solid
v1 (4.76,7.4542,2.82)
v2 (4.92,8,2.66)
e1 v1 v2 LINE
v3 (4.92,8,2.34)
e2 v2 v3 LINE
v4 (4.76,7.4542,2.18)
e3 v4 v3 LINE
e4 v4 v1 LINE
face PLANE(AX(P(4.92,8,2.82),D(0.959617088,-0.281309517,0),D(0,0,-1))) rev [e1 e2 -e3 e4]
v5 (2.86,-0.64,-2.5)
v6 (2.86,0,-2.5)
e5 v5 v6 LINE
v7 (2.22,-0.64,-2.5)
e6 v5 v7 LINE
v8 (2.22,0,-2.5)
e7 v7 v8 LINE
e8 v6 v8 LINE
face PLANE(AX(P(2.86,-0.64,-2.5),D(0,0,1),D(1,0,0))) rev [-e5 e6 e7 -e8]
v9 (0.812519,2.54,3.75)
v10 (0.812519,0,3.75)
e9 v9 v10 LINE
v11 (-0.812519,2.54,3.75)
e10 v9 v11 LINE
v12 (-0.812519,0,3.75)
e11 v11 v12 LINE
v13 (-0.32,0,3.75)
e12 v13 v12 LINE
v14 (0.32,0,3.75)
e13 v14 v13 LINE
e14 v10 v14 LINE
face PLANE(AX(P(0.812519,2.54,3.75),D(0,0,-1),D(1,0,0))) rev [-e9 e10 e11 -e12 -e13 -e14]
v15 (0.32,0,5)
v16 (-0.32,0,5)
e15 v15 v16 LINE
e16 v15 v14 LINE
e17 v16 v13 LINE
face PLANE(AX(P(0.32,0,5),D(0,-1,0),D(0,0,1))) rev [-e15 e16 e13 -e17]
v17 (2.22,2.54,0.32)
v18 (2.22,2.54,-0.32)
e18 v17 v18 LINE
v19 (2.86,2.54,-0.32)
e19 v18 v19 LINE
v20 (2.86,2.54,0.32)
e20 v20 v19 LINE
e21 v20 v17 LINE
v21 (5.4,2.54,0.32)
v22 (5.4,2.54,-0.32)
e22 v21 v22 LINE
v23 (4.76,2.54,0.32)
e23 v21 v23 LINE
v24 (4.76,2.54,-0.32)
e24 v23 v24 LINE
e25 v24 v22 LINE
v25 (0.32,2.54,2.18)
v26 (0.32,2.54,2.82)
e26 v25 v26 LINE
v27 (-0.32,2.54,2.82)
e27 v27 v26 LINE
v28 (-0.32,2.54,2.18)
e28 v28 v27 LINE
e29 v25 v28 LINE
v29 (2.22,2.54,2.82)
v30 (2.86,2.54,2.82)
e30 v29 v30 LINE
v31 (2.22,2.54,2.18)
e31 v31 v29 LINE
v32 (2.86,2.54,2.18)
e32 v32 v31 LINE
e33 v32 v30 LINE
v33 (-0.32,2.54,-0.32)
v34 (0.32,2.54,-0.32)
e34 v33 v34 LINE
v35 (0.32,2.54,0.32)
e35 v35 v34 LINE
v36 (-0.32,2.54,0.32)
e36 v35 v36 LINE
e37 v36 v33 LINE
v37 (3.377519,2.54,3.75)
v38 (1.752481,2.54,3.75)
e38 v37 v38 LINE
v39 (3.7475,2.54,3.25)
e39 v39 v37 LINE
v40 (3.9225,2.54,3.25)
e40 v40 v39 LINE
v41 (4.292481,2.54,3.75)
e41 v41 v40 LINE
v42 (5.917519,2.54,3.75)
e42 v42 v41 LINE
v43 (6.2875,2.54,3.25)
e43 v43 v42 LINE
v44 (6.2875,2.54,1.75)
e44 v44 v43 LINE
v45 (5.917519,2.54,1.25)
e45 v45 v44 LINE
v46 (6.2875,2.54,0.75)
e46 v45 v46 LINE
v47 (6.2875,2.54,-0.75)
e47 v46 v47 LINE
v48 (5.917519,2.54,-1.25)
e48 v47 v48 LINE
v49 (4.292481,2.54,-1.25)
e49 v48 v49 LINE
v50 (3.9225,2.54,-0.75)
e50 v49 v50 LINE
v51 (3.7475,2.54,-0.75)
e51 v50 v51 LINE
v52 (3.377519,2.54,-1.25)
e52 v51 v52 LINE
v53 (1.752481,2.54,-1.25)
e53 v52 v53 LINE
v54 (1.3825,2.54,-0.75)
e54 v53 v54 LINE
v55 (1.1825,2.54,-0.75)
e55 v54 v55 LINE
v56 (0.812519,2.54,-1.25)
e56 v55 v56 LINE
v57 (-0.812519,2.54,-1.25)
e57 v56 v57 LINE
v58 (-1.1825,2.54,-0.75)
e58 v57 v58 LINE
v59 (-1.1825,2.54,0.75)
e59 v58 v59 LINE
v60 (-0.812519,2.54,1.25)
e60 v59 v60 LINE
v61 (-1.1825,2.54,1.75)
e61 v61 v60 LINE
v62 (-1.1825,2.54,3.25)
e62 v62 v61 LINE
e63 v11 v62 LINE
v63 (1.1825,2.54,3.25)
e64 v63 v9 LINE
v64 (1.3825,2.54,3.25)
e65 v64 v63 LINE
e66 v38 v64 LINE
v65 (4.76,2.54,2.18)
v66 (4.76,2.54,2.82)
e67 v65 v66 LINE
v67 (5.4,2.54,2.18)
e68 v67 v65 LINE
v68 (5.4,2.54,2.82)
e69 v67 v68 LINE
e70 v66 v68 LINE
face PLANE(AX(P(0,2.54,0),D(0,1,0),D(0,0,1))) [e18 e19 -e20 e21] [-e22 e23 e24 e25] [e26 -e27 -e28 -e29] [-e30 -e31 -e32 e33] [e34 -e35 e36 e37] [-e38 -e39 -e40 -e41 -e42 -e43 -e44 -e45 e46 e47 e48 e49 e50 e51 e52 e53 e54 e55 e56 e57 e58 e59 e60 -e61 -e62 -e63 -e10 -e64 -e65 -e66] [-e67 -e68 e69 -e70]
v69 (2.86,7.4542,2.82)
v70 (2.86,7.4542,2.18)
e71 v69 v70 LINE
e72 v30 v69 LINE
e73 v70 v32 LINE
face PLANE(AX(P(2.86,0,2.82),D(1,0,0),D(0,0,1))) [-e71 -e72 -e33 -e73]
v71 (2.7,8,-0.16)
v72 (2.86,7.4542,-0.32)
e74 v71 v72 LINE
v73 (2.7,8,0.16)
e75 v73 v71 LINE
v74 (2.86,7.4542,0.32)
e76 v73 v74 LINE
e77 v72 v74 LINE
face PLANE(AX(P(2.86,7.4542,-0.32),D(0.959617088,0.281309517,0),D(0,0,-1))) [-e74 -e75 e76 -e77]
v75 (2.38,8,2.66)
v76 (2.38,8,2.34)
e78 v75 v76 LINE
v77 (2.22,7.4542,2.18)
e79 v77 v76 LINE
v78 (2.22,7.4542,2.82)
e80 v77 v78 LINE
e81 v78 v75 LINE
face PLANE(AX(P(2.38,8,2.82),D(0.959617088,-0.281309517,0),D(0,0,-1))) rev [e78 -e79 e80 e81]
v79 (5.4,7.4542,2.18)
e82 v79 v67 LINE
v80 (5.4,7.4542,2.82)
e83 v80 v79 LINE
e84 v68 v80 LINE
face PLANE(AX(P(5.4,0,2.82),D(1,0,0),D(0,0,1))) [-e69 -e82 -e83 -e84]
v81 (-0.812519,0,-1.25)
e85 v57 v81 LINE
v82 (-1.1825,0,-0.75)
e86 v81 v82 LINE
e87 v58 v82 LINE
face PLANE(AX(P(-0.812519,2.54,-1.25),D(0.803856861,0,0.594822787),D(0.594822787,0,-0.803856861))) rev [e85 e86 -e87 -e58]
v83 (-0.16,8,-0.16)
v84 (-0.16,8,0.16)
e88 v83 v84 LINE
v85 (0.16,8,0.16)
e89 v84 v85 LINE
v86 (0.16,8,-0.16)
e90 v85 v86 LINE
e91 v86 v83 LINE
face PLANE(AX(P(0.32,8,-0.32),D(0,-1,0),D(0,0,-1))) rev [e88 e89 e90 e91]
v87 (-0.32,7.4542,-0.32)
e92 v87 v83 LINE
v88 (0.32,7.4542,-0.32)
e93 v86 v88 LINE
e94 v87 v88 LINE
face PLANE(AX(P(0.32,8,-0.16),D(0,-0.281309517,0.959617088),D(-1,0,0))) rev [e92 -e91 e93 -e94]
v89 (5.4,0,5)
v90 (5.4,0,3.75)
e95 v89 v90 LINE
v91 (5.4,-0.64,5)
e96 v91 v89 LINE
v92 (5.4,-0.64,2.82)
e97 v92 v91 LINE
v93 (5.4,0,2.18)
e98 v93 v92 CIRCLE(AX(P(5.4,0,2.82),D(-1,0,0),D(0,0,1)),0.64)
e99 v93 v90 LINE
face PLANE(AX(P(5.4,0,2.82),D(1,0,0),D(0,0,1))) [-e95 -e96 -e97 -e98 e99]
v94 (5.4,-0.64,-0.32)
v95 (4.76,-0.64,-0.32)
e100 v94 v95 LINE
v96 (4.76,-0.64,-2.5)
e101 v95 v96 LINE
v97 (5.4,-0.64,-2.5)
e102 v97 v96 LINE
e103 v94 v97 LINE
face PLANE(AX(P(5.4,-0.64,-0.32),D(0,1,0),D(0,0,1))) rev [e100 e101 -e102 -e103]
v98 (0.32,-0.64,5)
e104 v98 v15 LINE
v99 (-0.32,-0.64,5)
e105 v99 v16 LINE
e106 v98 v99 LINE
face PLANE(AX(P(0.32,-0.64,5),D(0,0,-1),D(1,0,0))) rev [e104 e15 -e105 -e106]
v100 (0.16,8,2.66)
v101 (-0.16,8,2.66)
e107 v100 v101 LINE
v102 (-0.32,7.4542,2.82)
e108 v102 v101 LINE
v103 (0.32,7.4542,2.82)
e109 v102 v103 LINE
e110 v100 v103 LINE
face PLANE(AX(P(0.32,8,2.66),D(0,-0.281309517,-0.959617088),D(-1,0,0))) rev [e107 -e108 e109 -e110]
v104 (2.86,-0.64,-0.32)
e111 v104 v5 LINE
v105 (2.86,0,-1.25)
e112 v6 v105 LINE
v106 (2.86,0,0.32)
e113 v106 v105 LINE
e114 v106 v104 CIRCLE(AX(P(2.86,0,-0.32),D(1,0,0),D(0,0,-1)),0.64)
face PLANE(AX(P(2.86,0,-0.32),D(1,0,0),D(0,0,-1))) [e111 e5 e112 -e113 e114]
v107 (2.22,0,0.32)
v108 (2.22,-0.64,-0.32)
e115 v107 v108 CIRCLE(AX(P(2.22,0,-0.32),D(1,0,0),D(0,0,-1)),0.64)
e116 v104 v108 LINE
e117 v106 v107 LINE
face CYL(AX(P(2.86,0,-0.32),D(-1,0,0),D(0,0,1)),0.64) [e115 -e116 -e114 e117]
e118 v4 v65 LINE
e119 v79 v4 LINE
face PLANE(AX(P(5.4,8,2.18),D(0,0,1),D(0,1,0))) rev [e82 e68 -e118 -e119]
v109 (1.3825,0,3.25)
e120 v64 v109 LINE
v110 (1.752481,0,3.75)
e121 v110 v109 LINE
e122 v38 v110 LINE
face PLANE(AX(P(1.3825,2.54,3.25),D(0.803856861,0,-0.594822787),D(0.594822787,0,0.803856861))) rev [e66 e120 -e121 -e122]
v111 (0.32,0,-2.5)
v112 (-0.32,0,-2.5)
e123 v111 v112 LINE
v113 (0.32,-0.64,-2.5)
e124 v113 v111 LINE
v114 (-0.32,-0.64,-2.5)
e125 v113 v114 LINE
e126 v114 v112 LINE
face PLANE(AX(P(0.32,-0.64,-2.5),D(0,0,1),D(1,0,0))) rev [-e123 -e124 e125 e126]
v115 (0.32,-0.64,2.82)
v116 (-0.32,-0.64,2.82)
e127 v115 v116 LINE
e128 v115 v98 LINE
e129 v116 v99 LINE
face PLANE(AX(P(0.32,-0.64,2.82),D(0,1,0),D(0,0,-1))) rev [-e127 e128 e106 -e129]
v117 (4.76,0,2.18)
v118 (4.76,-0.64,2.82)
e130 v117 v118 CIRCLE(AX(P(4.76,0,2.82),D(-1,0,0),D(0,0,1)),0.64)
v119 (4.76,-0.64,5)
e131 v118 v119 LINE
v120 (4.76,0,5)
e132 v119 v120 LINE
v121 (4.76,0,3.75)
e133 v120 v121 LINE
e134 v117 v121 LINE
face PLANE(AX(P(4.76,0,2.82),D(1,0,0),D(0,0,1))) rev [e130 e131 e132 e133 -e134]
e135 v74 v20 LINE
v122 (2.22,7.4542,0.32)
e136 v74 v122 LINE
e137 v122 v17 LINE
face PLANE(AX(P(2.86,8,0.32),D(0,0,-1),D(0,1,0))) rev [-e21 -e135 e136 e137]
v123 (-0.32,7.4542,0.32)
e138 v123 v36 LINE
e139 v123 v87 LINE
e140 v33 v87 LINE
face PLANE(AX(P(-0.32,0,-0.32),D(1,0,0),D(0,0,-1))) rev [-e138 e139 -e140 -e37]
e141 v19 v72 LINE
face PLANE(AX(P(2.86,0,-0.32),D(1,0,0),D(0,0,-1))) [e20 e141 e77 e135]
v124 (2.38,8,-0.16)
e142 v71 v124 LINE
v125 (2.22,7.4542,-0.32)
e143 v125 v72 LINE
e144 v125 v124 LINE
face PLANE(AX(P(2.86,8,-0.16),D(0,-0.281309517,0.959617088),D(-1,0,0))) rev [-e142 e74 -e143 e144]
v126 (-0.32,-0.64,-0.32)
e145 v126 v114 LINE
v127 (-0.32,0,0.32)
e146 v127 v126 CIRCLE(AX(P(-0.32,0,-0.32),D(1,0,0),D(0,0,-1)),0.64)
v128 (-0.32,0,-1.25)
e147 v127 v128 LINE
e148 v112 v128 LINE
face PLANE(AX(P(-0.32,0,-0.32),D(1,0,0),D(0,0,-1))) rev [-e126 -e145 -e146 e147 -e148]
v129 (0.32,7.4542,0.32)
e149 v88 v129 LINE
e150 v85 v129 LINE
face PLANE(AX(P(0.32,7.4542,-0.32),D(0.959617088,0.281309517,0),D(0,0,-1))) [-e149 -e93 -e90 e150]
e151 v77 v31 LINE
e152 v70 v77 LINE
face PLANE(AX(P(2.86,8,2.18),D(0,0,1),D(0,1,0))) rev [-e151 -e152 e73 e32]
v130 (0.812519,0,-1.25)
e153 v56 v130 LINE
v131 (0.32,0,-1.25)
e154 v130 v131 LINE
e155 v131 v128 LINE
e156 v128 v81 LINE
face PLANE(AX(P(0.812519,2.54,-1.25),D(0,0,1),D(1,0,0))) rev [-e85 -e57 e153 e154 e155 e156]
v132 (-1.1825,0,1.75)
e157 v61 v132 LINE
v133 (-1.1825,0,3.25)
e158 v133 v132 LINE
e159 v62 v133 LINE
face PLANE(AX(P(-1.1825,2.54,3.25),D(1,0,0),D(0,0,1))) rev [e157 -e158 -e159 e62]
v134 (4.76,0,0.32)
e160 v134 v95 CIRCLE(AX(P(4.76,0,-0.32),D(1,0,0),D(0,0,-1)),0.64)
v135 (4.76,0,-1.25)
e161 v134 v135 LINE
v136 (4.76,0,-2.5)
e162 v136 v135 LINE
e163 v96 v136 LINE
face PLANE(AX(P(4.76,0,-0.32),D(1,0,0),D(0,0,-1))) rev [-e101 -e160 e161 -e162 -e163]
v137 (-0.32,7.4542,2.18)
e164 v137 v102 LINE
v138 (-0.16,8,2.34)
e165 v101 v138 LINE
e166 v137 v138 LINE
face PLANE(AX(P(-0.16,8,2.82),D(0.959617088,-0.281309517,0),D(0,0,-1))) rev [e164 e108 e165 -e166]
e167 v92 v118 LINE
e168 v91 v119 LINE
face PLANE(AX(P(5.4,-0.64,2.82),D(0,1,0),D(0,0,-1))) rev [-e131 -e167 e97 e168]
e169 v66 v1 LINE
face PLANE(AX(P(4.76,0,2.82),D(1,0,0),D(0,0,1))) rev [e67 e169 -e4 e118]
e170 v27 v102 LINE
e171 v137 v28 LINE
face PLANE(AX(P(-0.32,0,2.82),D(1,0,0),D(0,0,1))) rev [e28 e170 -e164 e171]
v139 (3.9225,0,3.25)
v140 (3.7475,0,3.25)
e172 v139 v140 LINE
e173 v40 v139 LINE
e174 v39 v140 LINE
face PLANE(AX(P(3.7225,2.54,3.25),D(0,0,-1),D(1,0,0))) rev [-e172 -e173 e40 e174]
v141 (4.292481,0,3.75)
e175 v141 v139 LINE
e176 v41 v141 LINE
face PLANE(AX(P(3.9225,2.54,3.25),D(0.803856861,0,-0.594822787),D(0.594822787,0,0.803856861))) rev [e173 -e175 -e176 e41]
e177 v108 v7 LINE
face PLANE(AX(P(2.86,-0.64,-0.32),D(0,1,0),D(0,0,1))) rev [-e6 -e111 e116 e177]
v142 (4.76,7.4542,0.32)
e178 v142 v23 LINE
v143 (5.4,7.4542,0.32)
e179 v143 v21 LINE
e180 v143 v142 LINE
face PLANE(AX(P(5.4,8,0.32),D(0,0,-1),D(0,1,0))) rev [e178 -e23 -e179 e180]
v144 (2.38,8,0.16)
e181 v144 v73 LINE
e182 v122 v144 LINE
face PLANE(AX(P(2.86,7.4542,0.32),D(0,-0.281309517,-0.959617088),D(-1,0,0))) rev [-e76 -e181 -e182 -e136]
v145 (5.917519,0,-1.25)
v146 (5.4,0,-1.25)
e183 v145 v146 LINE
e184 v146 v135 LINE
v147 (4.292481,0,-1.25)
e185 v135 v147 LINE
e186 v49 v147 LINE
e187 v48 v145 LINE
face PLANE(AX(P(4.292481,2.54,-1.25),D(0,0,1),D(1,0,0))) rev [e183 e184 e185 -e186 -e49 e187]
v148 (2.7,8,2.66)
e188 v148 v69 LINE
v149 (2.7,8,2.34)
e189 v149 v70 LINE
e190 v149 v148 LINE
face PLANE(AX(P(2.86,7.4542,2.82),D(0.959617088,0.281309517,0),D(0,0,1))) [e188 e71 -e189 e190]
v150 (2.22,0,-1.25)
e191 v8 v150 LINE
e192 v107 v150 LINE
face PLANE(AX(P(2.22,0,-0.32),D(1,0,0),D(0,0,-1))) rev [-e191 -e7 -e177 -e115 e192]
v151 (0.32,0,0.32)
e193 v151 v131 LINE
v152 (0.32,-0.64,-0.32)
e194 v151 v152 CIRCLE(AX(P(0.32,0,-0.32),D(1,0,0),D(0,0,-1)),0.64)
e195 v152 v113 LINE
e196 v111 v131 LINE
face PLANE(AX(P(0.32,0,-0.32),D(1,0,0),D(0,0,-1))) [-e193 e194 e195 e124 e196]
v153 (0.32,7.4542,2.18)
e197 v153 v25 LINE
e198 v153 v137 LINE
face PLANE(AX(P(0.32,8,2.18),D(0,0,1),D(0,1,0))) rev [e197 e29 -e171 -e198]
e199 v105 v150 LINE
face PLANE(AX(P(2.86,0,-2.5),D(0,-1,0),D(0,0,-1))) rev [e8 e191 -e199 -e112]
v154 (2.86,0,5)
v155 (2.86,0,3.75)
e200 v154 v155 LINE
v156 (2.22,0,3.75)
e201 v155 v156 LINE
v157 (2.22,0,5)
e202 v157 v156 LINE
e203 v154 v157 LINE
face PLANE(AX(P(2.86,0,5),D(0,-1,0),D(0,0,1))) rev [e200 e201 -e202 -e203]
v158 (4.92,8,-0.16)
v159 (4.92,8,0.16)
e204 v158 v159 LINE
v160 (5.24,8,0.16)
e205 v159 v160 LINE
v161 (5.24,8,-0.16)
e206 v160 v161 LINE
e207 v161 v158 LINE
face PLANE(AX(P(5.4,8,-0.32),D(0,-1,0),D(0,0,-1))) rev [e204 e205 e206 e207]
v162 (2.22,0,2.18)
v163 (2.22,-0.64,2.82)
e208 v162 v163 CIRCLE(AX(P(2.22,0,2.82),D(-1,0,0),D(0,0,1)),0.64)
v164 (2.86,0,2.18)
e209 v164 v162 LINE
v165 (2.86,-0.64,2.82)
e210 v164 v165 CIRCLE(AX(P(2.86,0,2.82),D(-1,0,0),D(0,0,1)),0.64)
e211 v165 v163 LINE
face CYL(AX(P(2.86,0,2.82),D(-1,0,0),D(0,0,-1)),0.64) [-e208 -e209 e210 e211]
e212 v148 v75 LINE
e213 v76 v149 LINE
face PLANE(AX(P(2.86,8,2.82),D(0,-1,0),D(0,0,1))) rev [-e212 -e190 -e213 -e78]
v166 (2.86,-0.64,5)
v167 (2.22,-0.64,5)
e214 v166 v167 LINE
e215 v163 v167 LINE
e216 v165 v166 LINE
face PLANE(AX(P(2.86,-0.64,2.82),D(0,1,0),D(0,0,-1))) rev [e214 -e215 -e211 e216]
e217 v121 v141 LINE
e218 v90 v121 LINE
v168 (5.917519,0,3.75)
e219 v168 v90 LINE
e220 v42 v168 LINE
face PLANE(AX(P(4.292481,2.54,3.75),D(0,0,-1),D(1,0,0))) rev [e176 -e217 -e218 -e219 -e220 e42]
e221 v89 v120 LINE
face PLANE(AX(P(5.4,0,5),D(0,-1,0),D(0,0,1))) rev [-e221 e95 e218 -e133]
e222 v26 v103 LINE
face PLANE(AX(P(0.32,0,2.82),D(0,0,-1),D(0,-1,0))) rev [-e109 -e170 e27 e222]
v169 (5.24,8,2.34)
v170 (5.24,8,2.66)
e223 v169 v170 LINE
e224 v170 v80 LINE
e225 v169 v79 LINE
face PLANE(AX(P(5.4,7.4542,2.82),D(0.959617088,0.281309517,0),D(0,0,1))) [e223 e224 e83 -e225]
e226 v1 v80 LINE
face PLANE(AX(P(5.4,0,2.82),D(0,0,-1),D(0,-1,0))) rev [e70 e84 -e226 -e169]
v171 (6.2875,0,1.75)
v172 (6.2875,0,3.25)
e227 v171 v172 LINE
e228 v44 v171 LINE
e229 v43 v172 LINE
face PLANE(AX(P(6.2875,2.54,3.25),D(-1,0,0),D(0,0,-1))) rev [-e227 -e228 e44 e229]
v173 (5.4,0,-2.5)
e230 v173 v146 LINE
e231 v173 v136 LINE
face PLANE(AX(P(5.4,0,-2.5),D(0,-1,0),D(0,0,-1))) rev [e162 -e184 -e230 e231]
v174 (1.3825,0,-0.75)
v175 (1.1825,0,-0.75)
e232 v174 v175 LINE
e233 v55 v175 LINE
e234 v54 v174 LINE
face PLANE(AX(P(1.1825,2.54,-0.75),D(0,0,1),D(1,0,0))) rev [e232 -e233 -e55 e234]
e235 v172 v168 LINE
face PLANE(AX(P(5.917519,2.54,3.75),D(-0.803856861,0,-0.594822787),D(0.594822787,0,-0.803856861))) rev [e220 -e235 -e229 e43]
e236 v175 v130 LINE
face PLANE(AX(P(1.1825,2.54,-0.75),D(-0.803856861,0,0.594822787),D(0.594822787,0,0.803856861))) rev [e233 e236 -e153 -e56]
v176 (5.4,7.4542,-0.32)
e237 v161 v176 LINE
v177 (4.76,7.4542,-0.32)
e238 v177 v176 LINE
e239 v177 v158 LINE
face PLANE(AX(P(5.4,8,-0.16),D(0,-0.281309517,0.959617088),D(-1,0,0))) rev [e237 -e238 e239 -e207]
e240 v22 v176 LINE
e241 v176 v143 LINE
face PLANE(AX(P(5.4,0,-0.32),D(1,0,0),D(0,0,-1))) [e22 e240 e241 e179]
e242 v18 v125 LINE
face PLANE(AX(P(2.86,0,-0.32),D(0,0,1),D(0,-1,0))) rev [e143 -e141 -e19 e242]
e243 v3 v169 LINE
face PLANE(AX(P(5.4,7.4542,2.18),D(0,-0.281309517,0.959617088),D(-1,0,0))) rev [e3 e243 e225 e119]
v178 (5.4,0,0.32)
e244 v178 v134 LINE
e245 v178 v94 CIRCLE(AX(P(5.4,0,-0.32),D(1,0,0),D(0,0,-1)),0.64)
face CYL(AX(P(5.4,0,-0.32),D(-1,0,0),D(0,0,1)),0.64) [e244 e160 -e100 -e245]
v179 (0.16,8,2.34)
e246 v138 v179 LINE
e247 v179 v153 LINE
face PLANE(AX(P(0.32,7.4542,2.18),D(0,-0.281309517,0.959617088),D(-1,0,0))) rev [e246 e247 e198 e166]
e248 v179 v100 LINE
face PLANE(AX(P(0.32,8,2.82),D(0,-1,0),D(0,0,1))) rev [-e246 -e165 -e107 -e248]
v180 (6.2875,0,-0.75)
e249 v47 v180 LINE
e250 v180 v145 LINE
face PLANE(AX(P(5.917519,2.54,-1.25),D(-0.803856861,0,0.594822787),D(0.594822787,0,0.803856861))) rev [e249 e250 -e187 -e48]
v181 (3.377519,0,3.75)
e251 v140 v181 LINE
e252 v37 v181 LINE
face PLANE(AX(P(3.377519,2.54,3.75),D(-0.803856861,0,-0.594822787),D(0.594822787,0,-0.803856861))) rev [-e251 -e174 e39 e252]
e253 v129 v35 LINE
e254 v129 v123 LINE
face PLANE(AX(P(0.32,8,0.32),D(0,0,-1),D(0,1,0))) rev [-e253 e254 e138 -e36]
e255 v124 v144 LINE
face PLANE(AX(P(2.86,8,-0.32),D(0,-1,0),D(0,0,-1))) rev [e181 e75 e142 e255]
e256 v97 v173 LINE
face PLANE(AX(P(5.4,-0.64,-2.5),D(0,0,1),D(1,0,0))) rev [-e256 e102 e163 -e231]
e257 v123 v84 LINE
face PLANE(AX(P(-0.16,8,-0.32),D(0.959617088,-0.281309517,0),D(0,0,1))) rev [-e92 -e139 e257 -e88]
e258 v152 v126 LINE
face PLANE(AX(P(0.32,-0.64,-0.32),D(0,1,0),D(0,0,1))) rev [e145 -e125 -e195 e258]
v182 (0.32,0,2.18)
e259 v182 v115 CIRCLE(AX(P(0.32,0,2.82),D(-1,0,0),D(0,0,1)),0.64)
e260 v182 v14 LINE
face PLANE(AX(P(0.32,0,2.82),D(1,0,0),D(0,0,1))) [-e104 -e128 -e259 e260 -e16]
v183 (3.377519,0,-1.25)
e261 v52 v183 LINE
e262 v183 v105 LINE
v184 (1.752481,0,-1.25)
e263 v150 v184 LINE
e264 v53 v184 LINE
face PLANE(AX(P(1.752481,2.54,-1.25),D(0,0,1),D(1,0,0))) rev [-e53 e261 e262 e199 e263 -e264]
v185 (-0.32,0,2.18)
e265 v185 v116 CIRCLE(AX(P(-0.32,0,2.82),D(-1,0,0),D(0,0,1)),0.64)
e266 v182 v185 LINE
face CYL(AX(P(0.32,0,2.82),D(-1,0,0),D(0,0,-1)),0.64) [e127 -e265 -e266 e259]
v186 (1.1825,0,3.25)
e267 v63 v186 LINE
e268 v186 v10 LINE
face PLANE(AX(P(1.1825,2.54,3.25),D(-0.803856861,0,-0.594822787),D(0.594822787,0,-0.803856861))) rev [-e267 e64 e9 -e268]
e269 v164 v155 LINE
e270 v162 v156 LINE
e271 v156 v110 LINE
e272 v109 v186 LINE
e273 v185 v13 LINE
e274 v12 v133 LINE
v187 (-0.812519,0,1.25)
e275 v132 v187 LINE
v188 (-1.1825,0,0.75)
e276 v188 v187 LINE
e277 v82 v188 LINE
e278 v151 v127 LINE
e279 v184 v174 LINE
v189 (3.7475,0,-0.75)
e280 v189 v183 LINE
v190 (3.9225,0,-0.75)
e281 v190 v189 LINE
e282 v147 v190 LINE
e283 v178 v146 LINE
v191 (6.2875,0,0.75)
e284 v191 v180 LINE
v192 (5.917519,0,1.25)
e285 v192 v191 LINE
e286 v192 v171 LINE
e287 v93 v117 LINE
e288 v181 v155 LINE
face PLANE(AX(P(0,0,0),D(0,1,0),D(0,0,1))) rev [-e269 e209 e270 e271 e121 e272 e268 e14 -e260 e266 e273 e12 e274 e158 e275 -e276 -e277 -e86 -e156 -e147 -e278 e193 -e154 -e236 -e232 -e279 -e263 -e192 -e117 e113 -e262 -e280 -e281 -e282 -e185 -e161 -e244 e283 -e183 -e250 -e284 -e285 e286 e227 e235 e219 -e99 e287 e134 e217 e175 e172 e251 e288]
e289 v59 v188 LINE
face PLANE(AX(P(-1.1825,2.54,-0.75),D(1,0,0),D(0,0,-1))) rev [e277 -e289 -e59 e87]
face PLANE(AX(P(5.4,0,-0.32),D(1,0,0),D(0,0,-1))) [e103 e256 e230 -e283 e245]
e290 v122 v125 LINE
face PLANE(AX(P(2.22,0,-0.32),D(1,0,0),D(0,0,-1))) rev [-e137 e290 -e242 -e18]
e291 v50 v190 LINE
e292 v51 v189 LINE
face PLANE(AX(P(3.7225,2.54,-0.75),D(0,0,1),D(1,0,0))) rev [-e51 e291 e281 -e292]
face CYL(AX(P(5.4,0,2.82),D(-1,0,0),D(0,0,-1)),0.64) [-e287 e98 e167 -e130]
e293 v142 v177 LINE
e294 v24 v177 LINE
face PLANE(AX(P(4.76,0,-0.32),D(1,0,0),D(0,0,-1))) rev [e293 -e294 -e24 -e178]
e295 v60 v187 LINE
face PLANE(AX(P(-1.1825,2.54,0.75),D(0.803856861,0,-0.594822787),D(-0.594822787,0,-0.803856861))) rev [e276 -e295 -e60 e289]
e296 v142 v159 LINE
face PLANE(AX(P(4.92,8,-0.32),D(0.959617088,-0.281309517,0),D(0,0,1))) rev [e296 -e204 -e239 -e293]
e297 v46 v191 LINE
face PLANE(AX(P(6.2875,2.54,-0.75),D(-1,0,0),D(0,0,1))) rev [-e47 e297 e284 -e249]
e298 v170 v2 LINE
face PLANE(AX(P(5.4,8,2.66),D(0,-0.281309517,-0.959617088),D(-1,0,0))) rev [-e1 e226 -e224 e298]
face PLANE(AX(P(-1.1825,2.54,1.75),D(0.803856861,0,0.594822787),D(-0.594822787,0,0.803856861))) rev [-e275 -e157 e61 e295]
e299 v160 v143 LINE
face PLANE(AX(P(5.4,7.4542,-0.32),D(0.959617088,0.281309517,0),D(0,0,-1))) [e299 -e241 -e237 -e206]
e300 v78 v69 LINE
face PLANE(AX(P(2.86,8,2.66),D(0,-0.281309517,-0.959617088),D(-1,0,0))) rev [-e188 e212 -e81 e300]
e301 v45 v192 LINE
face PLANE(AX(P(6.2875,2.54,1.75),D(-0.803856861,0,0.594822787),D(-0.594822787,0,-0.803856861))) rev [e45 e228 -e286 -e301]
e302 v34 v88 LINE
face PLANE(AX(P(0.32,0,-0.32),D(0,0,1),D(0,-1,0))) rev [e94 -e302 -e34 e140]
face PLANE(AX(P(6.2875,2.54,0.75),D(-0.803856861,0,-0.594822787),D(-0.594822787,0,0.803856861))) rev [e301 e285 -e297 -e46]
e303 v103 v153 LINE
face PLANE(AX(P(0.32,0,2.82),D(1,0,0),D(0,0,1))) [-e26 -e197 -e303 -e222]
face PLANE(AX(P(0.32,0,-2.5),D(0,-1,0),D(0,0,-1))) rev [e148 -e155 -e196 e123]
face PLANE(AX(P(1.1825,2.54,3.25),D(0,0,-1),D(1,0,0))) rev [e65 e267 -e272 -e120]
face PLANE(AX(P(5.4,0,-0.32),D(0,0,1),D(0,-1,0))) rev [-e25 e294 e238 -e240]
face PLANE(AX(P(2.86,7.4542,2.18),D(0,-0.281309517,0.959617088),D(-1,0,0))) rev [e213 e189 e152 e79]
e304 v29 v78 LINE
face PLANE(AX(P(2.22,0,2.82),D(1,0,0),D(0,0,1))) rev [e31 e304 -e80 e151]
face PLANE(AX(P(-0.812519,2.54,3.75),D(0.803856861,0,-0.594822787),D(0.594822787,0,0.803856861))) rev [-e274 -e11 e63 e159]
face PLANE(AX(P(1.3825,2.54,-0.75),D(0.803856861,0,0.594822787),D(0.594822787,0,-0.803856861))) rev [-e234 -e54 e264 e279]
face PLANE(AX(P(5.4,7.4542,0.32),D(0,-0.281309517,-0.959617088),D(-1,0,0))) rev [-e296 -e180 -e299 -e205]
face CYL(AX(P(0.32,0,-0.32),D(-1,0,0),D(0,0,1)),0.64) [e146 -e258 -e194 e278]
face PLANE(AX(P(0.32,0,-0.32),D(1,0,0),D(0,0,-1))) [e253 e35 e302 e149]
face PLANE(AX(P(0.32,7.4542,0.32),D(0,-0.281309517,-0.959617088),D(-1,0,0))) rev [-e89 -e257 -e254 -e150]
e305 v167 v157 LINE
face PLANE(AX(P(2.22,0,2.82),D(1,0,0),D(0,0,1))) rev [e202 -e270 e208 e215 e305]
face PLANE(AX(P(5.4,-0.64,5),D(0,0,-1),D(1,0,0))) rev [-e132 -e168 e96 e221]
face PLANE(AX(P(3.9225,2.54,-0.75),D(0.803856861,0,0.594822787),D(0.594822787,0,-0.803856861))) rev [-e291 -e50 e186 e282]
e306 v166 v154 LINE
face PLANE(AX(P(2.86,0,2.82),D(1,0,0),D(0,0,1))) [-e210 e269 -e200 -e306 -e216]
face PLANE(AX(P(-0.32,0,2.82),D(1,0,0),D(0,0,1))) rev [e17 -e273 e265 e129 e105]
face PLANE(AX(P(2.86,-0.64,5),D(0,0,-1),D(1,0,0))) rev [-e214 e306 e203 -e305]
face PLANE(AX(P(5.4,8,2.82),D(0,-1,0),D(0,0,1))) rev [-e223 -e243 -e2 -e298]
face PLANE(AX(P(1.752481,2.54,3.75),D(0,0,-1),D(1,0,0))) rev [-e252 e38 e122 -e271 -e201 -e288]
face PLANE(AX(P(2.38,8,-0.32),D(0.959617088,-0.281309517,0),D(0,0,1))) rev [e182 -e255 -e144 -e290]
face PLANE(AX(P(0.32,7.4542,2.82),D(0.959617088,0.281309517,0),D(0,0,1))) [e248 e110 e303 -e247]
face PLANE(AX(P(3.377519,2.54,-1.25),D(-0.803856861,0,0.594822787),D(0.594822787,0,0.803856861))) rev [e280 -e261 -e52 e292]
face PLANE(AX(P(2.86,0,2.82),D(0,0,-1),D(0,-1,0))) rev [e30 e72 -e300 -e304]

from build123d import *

# Parameters (mm, degrees)
BOSS_EXTRUDE3_DEPTH = 2.54
BOSS_EXTRUDE4_DEPTH = 2.54
LPATTERN1_COUNT     = 2
LPATTERN1_PITCH     = 2.54
BOSS_EXTRUDE5_DEPTH = 0.32
CHAMFER1_SIZE       = 0.16
CHAMFER1_SIZE2      = 0.5458
LPATTERN2_START     = 2.38
LPATTERN2_DEPTH     = 0.32
LPATTERN2_START_2   = 4.92
LPATTERN2_2_DEPTH   = 0.32
LPATTERN2_START_3   = 2.22
LPATTERN2_3_DEPTH   = 0.64
LPATTERN2_START_4   = 4.76
LPATTERN2_4_DEPTH   = 0.64
LPATTERN2_START_5   = -0.32
LPATTERN2_5_DEPTH   = 0.64
LPATTERN2_START_6   = 1
LPATTERN2_6_DEPTH   = 5
SKETCH9_W           = 6.730038924
SKETCH9_H           = 1
BOSS_EXTRUDE6_DEPTH = 2.54


with BuildPart() as part:
    # Sketch6 → Boss-Extrude3 (new body)
    with BuildSketch(Plane(origin=(0, 0, 0), x_dir=(1, 0, 0), z_dir=(0, 1, 0))):
        Polygon((-1.1825, 0.75), (-1.1825, -0.75), (-0.812519462, -1.25), (0.812519462, -1.25), (1.1825, -0.75), (1.1825, 0.75), (0.812519462, 1.25), (-0.812519462, 1.25), align=None)
    extrude(amount=BOSS_EXTRUDE3_DEPTH)

    # Sketch7 → Boss-Extrude4 (add)
    with BuildSketch(Plane(origin=(0, 0, 0), x_dir=(1, 0, 0), z_dir=(0, 1, 0))):
        Polygon((1.1825, 0.75), (1.1825, -0.75), (1.3825, -0.75), (1.752480538, -1.25), (3.377519462, -1.25), (3.7475, -0.75), (3.7475, 0.75), (3.377519462, 1.25), (1.752480538, 1.25), (1.3825, 0.75), align=None)
    boss_extrude4 = extrude(amount=BOSS_EXTRUDE4_DEPTH)

    # LPattern1: Boss-Extrude4 ×2
    with Locations(*[(i * LPATTERN1_PITCH, 0, 0) for i in range(1, LPATTERN1_COUNT)]):
        add(boss_extrude4)

    # Sketch8 → Boss-Extrude5 (add, symmetric)
    with BuildSketch(Plane(origin=(0, 0, 0), x_dir=(0, 0, -1), z_dir=(1, 0, 0))):
        with BuildLine():
            Line((0.32, 0), (0.32, 8))
            Line((0.32, 8), (-0.32, 8))
            Line((-0.32, 8), (-0.32, 0))
            ThreePointArc((-0.32, 0), (-0.13254834, -0.45254834), (0.32, -0.64))
            Line((0.32, -0.64), (2.5, -0.64))
            Line((2.5, -0.64), (2.5, 0))
            Line((2.5, 0), (0.32, 0))
        make_face()
    extrude(amount=BOSS_EXTRUDE5_DEPTH, both=True)

    # Chamfer1
    chamfer1_edges = [part.edges().sort_by_distance(p)[0] for p in [
        (-0.32, 8, 0),
        (0, 8, -0.32),
        (0, 8, 0.32),
        (0.32, 8, 0),
    ]]
    chamfer1_side = [part.faces().sort_by_distance(p)[0] for p in [
        (0, 8, 0),
    ]]
    chamfer(chamfer1_edges, length=CHAMFER1_SIZE, length2=CHAMFER1_SIZE2, reference=chamfer1_side[0])

    # LPattern2: read off the stored shape, not the designer's step
    # LPattern2 outline → LPattern2 (add)
    with BuildSketch(Plane.YZ.offset(LPATTERN2_START)):
        with BuildLine():
            Line((-0.64, -0.32), (-0.64, -2.5))
            Line((-0.64, -2.5), (0, -2.5))
            Line((0, -2.5), (0, 0.32))
            ThreePointArc((0, 0.32), (-0.45254834, 0.13254834), (-0.64, -0.32))
        make_face()
        Polygon((2.54, -0.32), (7.4542, -0.32), (8, -0.16), (8, 0.16), (7.4542, 0.32), (2.54, 0.32), align=None)
    extrude(amount=LPATTERN2_DEPTH)

    # LPattern2 2 outline → LPattern2 2 (add)
    with BuildSketch(Plane.YZ.offset(LPATTERN2_START_2)):
        with BuildLine():
            Line((-0.64, -0.32), (-0.64, -2.5))
            Line((-0.64, -2.5), (0, -2.5))
            Line((0, -2.5), (0, 0.32))
            ThreePointArc((0, 0.32), (-0.45254834, 0.13254834), (-0.64, -0.32))
        make_face()
        Polygon((2.54, -0.32), (7.4542, -0.32), (8, -0.16), (8, 0.16), (7.4542, 0.32), (2.54, 0.32), align=None)
    extrude(amount=LPATTERN2_2_DEPTH)

    # LPattern2 3 outline → LPattern2 3 (add)
    with BuildSketch(Plane.YZ.offset(LPATTERN2_START_3)):
        with BuildLine():
            Line((-0.64, -0.32), (-0.64, -2.5))
            Line((-0.64, -2.5), (0, -2.5))
            Line((0, -2.5), (0, 0.32))
            ThreePointArc((0, 0.32), (-0.45254834, 0.13254834), (-0.64, -0.32))
        make_face()
    extrude(amount=LPATTERN2_3_DEPTH)

    # LPattern2 4 outline → LPattern2 4 (add)
    with BuildSketch(Plane.YZ.offset(LPATTERN2_START_4)):
        with BuildLine():
            Line((-0.64, -0.32), (-0.64, -2.5))
            Line((-0.64, -2.5), (0, -2.5))
            Line((0, -2.5), (0, 0.32))
            ThreePointArc((0, 0.32), (-0.45254834, 0.13254834), (-0.64, -0.32))
        make_face()
    extrude(amount=LPATTERN2_4_DEPTH)

    # LPattern2 5 outline → LPattern2 5 (add)
    with BuildSketch(Plane.XY.offset(LPATTERN2_START_5)):
        Polygon((5.24, 8), (5.24, 2.54), (5.4, 2.54), (5.4, 7.4542), align=None)
        Polygon((4.76, 7.4542), (4.76, 2.54), (4.92, 2.54), (4.92, 8), align=None)
        Polygon((2.7, 8), (2.7, 2.54), (2.86, 2.54), (2.86, 7.4542), align=None)
        Polygon((2.22, 7.4542), (2.22, 2.54), (2.38, 2.54), (2.38, 8), align=None)
    extrude(amount=LPATTERN2_5_DEPTH)

    # LPattern2 6 outline → LPattern2 6 (cut)
    with BuildSketch(Plane.YZ.offset(LPATTERN2_START_6)):
        Polygon((7.4542, 0.32), (8, 0.16), (8, 0.32), align=None)
        Polygon((7.4542, -0.32), (8, -0.32), (8, -0.16), align=None)
    extrude(amount=LPATTERN2_6_DEPTH, mode=Mode.SUBTRACT)

    # Mirror1: part across plane


with BuildPart() as part_1:
    add(part.part)
    add(part.part.mirror(Plane(origin=(-0.812519462, 2.54, 1.25), x_dir=(1, 0, 0), z_dir=(0, 0, -1))))

    # Sketch9 → Boss-Extrude6 (add)
    with BuildSketch(Plane.XZ):
        with Locations((2.5525, 1.25)):
            Rectangle(SKETCH9_W, SKETCH9_H)
    extrude(amount=-BOSS_EXTRUDE6_DEPTH)


solid = part_1.part
